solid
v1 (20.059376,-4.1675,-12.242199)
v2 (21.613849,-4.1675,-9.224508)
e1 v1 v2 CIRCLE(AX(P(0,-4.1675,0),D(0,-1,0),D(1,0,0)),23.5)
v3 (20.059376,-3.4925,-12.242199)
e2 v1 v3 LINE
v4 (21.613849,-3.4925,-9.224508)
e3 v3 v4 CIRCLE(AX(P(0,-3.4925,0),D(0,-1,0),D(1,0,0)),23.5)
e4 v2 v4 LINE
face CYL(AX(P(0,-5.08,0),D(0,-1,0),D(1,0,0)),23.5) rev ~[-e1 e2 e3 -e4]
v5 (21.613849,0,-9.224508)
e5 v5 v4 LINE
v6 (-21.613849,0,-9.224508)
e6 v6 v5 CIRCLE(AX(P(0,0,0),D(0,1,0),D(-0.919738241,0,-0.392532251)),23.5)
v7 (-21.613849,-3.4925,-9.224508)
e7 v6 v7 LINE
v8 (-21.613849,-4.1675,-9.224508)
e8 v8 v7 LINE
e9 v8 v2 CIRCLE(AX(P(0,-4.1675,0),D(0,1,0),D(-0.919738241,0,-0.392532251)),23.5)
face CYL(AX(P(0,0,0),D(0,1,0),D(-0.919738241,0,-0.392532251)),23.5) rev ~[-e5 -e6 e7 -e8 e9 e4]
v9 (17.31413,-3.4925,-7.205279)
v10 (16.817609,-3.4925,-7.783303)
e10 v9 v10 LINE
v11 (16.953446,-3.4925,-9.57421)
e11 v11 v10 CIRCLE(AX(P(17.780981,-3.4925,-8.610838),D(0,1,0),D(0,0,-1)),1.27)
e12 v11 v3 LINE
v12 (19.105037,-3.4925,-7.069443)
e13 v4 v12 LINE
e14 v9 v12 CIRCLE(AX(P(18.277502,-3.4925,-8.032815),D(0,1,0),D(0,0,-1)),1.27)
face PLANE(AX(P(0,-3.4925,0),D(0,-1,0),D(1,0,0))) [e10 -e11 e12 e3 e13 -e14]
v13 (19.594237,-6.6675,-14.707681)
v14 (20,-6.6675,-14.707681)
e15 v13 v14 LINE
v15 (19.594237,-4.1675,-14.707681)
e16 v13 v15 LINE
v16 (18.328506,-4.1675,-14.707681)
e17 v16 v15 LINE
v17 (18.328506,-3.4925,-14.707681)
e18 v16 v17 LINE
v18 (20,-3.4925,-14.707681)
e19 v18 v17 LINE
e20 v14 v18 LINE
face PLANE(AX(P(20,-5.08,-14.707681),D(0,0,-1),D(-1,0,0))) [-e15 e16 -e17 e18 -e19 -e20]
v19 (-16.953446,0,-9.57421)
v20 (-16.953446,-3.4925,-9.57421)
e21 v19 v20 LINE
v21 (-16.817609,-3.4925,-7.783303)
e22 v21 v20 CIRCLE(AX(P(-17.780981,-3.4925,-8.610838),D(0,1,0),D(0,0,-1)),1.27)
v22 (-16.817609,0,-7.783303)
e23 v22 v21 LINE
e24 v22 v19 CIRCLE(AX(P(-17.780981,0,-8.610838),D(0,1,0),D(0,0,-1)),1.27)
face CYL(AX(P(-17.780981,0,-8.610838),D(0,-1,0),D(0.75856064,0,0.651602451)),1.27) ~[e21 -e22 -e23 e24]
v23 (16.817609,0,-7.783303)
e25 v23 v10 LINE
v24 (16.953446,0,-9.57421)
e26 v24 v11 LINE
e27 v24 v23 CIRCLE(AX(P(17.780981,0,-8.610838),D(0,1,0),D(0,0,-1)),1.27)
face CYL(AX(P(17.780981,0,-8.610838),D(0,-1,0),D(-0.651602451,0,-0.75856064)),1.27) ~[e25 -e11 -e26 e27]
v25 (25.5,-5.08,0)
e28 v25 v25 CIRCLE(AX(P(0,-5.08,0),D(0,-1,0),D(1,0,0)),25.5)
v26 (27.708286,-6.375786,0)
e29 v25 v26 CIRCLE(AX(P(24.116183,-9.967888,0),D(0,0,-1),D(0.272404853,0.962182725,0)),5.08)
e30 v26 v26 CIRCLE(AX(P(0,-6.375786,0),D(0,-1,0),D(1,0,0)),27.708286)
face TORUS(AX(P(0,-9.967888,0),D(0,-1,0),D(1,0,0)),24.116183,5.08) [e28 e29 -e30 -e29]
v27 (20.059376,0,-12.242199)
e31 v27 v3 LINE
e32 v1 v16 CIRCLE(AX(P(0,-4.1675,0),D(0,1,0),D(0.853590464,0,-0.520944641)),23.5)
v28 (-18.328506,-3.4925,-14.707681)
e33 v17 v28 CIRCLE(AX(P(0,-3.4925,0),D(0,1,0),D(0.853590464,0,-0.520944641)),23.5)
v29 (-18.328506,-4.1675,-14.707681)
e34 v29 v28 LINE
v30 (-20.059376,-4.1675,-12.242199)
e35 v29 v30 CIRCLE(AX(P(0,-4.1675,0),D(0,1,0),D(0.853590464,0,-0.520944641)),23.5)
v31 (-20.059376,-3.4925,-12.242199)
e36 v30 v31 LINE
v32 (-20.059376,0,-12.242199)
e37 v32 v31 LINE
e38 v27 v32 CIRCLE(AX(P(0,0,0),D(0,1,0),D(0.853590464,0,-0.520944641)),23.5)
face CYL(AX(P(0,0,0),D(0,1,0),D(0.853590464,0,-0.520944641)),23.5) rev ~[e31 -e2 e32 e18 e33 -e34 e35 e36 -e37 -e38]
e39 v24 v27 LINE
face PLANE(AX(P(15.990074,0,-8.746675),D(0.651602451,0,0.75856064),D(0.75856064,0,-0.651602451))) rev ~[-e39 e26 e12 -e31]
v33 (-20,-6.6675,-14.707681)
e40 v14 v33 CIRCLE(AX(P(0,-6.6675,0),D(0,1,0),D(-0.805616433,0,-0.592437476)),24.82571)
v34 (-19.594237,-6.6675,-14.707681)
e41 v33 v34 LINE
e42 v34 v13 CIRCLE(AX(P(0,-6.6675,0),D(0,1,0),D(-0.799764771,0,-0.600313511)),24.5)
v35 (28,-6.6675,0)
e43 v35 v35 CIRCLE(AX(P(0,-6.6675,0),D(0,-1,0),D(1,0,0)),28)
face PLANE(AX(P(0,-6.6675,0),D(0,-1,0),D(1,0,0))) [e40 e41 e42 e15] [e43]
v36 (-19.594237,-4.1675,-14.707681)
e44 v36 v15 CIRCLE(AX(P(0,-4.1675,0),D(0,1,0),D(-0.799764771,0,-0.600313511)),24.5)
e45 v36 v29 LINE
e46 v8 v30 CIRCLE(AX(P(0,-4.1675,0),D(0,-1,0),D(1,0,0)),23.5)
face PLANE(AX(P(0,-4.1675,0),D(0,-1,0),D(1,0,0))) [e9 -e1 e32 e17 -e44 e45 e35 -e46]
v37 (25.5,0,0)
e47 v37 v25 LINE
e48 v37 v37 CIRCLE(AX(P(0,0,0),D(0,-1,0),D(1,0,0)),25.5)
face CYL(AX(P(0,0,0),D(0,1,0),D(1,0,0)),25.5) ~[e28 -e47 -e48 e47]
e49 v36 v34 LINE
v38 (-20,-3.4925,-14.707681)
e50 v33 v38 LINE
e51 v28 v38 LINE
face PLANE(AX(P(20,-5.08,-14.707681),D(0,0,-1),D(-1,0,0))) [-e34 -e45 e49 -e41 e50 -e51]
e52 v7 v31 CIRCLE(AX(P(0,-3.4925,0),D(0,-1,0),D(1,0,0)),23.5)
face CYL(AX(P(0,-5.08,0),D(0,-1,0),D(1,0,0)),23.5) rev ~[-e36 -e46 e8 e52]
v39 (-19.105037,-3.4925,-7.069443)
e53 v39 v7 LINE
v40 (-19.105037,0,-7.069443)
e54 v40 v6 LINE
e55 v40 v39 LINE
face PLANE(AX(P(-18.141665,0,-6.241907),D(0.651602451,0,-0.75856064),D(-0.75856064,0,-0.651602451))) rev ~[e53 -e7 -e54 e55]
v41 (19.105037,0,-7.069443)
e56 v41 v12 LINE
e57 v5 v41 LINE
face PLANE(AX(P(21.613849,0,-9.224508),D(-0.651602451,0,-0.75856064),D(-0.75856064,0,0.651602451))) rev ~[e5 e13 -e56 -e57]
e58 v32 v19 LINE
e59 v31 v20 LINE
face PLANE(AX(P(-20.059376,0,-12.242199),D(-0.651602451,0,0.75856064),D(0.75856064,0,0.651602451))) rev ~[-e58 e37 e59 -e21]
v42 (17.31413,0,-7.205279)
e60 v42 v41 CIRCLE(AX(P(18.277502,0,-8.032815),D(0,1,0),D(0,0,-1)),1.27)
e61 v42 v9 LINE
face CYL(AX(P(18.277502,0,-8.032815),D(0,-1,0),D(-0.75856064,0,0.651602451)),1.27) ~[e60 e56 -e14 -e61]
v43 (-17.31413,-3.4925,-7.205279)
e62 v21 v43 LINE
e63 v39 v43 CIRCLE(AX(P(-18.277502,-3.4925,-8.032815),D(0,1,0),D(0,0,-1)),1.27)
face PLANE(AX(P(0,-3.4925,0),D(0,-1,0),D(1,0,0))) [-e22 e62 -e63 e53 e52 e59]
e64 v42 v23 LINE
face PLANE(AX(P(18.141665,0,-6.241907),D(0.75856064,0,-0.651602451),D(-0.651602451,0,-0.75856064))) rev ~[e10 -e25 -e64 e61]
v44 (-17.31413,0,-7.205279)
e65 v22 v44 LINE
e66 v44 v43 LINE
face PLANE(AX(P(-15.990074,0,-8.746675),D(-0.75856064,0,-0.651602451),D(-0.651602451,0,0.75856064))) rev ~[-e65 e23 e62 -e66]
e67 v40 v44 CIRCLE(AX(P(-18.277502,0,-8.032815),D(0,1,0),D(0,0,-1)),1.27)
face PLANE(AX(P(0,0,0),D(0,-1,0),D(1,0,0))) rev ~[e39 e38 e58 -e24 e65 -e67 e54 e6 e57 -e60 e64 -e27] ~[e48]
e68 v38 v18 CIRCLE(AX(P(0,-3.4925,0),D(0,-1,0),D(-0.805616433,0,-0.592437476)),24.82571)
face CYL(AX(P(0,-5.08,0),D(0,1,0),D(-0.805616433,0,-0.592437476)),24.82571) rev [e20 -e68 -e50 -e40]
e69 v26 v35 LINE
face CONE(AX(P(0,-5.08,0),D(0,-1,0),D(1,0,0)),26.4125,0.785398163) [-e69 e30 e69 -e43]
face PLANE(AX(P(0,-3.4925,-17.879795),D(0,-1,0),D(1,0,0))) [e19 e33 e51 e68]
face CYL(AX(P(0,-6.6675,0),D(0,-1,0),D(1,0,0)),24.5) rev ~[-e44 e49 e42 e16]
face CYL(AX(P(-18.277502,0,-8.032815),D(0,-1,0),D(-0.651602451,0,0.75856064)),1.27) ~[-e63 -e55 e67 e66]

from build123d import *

# Parameters (mm, degrees)
F0_R          = 25.5
F1_DEPTH      = 5.08
F3_R          = 28
F3_R_2        = 23.5
F4_DEPTH      = 1.5875
F5_DEPTH      = 1.5875
F5_DEPTH_BACK = 3.175
F6_DEPTH      = 1.5875
F9_R          = 24.5
F10_DEPTH     = 2.5
F11_R         = 1.27


# Not quite as in the source:
# - a fillet or chamfer that OpenCascade refuses, or shapes differently, is made with other operations: its cross-section is extruded or revolved along the edge and cut away or added


with BuildPart() as f1:
    # F0 (on Front) → F1 (new body)
    with BuildSketch(Plane.XZ):
        Circle(F0_R)
        with BuildLine():
            ThreePointArc((20.0593759089, -12.2421990731), (0, -23.5), (-20.0593759089, -12.2421990731))
            Line((-20.0593759089, -12.2421990731), (-15.990073811, -8.7466746798))
            Line((-15.990073811, -8.7466746798), (-18.1416651056, -6.2419074449))
            Line((-18.1416651056, -6.2419074449), (-21.61384866, -9.2245079057))
            ThreePointArc((-21.61384866, -9.2245079057), (0, 23.5), (21.61384866, -9.2245079057))
            Line((21.61384866, -9.2245079057), (18.1416651056, -6.2419074449))
            Line((18.1416651056, -6.2419074449), (15.990073811, -8.7466746798))
            Line((15.990073811, -8.7466746798), (20.0593759089, -12.2421990731))
        make_face(mode=Mode.SUBTRACT)
    extrude(amount=F1_DEPTH)

    # F3 (on face) → F4 (join)
    with BuildSketch(Plane.XZ.offset(5.08)):
        Circle(F3_R)
        Circle(F3_R_2, mode=Mode.SUBTRACT)
    extrude(amount=F4_DEPTH)

    # F2 (on face) → F5 (cut, two sides)
    with BuildSketch(Plane.XZ.offset(5.08)) as f5_sk:
        with BuildLine():
            Line((20, -14.7076810144), (-20, -14.7076810144))
            ThreePointArc((-20, -14.7076810144), (0, -24.8257100769), (20, -14.7076810144))
        make_face()
    extrude(amount=-F5_DEPTH, mode=Mode.SUBTRACT)
    extrude(f5_sk.sketch, amount=F5_DEPTH_BACK, mode=Mode.SUBTRACT)

    # F6 (cut): faces of the model
    f6_faces = [f1.faces().sort_by_distance(p)[0] for p in [
        (18.9429993018, -5.08, -9.163640961),
        (-18.9429993018, -5.08, -9.163640961),
    ]]
    extrude(f6_faces, amount=-F6_DEPTH, mode=Mode.SUBTRACT)

    # F7: chamfer of 1.5875 on 1 edges, made by hand

    # F7_s1 → F7_t2 (revolve, cut)
    with BuildSketch(Plane.XY):
        Polygon((26.4125, -5.08), (28, -6.6675), (28, -5.08), align=None)
    revolve(axis=Axis((0, -5.08, 0), (0, -1, 0)), mode=Mode.SUBTRACT)

    # F8: fillet of radius 5.08 on 1 edges, made by hand

    # F8_s1 → F8_t2 (revolve, cut)
    with BuildSketch(Plane.XY):
        with BuildLine():
            ThreePointArc((25.5, -5.08), (26.6871185711, -5.586485263), (27.7082857935, -6.3757857935))
            Line((27.7082857935, -6.3757857935), (26.4125, -5.08))
            Line((26.4125, -5.08), (25.5, -5.08))
        make_face()
    revolve(axis=Axis((0, -5.08, 0), (0, -1, 0)), mode=Mode.SUBTRACT)

    # F9 (on face) → F10 (cut)
    with BuildSketch(Plane.XZ.offset(6.6675)):
        Circle(F9_R)
    extrude(amount=-F10_DEPTH, mode=Mode.SUBTRACT)

    # F11
    f11_edges = [f1.edges().sort_by_distance(p)[0] for p in [
        (-15.990074, -1.74625, -8.746675),
        (-18.141665, -1.74625, -6.241907),
        (15.990074, -1.74625, -8.746675),
        (18.141665, -1.74625, -6.241907),
    ]]
    fillet(f11_edges, radius=F11_R)


solid = f1.part
